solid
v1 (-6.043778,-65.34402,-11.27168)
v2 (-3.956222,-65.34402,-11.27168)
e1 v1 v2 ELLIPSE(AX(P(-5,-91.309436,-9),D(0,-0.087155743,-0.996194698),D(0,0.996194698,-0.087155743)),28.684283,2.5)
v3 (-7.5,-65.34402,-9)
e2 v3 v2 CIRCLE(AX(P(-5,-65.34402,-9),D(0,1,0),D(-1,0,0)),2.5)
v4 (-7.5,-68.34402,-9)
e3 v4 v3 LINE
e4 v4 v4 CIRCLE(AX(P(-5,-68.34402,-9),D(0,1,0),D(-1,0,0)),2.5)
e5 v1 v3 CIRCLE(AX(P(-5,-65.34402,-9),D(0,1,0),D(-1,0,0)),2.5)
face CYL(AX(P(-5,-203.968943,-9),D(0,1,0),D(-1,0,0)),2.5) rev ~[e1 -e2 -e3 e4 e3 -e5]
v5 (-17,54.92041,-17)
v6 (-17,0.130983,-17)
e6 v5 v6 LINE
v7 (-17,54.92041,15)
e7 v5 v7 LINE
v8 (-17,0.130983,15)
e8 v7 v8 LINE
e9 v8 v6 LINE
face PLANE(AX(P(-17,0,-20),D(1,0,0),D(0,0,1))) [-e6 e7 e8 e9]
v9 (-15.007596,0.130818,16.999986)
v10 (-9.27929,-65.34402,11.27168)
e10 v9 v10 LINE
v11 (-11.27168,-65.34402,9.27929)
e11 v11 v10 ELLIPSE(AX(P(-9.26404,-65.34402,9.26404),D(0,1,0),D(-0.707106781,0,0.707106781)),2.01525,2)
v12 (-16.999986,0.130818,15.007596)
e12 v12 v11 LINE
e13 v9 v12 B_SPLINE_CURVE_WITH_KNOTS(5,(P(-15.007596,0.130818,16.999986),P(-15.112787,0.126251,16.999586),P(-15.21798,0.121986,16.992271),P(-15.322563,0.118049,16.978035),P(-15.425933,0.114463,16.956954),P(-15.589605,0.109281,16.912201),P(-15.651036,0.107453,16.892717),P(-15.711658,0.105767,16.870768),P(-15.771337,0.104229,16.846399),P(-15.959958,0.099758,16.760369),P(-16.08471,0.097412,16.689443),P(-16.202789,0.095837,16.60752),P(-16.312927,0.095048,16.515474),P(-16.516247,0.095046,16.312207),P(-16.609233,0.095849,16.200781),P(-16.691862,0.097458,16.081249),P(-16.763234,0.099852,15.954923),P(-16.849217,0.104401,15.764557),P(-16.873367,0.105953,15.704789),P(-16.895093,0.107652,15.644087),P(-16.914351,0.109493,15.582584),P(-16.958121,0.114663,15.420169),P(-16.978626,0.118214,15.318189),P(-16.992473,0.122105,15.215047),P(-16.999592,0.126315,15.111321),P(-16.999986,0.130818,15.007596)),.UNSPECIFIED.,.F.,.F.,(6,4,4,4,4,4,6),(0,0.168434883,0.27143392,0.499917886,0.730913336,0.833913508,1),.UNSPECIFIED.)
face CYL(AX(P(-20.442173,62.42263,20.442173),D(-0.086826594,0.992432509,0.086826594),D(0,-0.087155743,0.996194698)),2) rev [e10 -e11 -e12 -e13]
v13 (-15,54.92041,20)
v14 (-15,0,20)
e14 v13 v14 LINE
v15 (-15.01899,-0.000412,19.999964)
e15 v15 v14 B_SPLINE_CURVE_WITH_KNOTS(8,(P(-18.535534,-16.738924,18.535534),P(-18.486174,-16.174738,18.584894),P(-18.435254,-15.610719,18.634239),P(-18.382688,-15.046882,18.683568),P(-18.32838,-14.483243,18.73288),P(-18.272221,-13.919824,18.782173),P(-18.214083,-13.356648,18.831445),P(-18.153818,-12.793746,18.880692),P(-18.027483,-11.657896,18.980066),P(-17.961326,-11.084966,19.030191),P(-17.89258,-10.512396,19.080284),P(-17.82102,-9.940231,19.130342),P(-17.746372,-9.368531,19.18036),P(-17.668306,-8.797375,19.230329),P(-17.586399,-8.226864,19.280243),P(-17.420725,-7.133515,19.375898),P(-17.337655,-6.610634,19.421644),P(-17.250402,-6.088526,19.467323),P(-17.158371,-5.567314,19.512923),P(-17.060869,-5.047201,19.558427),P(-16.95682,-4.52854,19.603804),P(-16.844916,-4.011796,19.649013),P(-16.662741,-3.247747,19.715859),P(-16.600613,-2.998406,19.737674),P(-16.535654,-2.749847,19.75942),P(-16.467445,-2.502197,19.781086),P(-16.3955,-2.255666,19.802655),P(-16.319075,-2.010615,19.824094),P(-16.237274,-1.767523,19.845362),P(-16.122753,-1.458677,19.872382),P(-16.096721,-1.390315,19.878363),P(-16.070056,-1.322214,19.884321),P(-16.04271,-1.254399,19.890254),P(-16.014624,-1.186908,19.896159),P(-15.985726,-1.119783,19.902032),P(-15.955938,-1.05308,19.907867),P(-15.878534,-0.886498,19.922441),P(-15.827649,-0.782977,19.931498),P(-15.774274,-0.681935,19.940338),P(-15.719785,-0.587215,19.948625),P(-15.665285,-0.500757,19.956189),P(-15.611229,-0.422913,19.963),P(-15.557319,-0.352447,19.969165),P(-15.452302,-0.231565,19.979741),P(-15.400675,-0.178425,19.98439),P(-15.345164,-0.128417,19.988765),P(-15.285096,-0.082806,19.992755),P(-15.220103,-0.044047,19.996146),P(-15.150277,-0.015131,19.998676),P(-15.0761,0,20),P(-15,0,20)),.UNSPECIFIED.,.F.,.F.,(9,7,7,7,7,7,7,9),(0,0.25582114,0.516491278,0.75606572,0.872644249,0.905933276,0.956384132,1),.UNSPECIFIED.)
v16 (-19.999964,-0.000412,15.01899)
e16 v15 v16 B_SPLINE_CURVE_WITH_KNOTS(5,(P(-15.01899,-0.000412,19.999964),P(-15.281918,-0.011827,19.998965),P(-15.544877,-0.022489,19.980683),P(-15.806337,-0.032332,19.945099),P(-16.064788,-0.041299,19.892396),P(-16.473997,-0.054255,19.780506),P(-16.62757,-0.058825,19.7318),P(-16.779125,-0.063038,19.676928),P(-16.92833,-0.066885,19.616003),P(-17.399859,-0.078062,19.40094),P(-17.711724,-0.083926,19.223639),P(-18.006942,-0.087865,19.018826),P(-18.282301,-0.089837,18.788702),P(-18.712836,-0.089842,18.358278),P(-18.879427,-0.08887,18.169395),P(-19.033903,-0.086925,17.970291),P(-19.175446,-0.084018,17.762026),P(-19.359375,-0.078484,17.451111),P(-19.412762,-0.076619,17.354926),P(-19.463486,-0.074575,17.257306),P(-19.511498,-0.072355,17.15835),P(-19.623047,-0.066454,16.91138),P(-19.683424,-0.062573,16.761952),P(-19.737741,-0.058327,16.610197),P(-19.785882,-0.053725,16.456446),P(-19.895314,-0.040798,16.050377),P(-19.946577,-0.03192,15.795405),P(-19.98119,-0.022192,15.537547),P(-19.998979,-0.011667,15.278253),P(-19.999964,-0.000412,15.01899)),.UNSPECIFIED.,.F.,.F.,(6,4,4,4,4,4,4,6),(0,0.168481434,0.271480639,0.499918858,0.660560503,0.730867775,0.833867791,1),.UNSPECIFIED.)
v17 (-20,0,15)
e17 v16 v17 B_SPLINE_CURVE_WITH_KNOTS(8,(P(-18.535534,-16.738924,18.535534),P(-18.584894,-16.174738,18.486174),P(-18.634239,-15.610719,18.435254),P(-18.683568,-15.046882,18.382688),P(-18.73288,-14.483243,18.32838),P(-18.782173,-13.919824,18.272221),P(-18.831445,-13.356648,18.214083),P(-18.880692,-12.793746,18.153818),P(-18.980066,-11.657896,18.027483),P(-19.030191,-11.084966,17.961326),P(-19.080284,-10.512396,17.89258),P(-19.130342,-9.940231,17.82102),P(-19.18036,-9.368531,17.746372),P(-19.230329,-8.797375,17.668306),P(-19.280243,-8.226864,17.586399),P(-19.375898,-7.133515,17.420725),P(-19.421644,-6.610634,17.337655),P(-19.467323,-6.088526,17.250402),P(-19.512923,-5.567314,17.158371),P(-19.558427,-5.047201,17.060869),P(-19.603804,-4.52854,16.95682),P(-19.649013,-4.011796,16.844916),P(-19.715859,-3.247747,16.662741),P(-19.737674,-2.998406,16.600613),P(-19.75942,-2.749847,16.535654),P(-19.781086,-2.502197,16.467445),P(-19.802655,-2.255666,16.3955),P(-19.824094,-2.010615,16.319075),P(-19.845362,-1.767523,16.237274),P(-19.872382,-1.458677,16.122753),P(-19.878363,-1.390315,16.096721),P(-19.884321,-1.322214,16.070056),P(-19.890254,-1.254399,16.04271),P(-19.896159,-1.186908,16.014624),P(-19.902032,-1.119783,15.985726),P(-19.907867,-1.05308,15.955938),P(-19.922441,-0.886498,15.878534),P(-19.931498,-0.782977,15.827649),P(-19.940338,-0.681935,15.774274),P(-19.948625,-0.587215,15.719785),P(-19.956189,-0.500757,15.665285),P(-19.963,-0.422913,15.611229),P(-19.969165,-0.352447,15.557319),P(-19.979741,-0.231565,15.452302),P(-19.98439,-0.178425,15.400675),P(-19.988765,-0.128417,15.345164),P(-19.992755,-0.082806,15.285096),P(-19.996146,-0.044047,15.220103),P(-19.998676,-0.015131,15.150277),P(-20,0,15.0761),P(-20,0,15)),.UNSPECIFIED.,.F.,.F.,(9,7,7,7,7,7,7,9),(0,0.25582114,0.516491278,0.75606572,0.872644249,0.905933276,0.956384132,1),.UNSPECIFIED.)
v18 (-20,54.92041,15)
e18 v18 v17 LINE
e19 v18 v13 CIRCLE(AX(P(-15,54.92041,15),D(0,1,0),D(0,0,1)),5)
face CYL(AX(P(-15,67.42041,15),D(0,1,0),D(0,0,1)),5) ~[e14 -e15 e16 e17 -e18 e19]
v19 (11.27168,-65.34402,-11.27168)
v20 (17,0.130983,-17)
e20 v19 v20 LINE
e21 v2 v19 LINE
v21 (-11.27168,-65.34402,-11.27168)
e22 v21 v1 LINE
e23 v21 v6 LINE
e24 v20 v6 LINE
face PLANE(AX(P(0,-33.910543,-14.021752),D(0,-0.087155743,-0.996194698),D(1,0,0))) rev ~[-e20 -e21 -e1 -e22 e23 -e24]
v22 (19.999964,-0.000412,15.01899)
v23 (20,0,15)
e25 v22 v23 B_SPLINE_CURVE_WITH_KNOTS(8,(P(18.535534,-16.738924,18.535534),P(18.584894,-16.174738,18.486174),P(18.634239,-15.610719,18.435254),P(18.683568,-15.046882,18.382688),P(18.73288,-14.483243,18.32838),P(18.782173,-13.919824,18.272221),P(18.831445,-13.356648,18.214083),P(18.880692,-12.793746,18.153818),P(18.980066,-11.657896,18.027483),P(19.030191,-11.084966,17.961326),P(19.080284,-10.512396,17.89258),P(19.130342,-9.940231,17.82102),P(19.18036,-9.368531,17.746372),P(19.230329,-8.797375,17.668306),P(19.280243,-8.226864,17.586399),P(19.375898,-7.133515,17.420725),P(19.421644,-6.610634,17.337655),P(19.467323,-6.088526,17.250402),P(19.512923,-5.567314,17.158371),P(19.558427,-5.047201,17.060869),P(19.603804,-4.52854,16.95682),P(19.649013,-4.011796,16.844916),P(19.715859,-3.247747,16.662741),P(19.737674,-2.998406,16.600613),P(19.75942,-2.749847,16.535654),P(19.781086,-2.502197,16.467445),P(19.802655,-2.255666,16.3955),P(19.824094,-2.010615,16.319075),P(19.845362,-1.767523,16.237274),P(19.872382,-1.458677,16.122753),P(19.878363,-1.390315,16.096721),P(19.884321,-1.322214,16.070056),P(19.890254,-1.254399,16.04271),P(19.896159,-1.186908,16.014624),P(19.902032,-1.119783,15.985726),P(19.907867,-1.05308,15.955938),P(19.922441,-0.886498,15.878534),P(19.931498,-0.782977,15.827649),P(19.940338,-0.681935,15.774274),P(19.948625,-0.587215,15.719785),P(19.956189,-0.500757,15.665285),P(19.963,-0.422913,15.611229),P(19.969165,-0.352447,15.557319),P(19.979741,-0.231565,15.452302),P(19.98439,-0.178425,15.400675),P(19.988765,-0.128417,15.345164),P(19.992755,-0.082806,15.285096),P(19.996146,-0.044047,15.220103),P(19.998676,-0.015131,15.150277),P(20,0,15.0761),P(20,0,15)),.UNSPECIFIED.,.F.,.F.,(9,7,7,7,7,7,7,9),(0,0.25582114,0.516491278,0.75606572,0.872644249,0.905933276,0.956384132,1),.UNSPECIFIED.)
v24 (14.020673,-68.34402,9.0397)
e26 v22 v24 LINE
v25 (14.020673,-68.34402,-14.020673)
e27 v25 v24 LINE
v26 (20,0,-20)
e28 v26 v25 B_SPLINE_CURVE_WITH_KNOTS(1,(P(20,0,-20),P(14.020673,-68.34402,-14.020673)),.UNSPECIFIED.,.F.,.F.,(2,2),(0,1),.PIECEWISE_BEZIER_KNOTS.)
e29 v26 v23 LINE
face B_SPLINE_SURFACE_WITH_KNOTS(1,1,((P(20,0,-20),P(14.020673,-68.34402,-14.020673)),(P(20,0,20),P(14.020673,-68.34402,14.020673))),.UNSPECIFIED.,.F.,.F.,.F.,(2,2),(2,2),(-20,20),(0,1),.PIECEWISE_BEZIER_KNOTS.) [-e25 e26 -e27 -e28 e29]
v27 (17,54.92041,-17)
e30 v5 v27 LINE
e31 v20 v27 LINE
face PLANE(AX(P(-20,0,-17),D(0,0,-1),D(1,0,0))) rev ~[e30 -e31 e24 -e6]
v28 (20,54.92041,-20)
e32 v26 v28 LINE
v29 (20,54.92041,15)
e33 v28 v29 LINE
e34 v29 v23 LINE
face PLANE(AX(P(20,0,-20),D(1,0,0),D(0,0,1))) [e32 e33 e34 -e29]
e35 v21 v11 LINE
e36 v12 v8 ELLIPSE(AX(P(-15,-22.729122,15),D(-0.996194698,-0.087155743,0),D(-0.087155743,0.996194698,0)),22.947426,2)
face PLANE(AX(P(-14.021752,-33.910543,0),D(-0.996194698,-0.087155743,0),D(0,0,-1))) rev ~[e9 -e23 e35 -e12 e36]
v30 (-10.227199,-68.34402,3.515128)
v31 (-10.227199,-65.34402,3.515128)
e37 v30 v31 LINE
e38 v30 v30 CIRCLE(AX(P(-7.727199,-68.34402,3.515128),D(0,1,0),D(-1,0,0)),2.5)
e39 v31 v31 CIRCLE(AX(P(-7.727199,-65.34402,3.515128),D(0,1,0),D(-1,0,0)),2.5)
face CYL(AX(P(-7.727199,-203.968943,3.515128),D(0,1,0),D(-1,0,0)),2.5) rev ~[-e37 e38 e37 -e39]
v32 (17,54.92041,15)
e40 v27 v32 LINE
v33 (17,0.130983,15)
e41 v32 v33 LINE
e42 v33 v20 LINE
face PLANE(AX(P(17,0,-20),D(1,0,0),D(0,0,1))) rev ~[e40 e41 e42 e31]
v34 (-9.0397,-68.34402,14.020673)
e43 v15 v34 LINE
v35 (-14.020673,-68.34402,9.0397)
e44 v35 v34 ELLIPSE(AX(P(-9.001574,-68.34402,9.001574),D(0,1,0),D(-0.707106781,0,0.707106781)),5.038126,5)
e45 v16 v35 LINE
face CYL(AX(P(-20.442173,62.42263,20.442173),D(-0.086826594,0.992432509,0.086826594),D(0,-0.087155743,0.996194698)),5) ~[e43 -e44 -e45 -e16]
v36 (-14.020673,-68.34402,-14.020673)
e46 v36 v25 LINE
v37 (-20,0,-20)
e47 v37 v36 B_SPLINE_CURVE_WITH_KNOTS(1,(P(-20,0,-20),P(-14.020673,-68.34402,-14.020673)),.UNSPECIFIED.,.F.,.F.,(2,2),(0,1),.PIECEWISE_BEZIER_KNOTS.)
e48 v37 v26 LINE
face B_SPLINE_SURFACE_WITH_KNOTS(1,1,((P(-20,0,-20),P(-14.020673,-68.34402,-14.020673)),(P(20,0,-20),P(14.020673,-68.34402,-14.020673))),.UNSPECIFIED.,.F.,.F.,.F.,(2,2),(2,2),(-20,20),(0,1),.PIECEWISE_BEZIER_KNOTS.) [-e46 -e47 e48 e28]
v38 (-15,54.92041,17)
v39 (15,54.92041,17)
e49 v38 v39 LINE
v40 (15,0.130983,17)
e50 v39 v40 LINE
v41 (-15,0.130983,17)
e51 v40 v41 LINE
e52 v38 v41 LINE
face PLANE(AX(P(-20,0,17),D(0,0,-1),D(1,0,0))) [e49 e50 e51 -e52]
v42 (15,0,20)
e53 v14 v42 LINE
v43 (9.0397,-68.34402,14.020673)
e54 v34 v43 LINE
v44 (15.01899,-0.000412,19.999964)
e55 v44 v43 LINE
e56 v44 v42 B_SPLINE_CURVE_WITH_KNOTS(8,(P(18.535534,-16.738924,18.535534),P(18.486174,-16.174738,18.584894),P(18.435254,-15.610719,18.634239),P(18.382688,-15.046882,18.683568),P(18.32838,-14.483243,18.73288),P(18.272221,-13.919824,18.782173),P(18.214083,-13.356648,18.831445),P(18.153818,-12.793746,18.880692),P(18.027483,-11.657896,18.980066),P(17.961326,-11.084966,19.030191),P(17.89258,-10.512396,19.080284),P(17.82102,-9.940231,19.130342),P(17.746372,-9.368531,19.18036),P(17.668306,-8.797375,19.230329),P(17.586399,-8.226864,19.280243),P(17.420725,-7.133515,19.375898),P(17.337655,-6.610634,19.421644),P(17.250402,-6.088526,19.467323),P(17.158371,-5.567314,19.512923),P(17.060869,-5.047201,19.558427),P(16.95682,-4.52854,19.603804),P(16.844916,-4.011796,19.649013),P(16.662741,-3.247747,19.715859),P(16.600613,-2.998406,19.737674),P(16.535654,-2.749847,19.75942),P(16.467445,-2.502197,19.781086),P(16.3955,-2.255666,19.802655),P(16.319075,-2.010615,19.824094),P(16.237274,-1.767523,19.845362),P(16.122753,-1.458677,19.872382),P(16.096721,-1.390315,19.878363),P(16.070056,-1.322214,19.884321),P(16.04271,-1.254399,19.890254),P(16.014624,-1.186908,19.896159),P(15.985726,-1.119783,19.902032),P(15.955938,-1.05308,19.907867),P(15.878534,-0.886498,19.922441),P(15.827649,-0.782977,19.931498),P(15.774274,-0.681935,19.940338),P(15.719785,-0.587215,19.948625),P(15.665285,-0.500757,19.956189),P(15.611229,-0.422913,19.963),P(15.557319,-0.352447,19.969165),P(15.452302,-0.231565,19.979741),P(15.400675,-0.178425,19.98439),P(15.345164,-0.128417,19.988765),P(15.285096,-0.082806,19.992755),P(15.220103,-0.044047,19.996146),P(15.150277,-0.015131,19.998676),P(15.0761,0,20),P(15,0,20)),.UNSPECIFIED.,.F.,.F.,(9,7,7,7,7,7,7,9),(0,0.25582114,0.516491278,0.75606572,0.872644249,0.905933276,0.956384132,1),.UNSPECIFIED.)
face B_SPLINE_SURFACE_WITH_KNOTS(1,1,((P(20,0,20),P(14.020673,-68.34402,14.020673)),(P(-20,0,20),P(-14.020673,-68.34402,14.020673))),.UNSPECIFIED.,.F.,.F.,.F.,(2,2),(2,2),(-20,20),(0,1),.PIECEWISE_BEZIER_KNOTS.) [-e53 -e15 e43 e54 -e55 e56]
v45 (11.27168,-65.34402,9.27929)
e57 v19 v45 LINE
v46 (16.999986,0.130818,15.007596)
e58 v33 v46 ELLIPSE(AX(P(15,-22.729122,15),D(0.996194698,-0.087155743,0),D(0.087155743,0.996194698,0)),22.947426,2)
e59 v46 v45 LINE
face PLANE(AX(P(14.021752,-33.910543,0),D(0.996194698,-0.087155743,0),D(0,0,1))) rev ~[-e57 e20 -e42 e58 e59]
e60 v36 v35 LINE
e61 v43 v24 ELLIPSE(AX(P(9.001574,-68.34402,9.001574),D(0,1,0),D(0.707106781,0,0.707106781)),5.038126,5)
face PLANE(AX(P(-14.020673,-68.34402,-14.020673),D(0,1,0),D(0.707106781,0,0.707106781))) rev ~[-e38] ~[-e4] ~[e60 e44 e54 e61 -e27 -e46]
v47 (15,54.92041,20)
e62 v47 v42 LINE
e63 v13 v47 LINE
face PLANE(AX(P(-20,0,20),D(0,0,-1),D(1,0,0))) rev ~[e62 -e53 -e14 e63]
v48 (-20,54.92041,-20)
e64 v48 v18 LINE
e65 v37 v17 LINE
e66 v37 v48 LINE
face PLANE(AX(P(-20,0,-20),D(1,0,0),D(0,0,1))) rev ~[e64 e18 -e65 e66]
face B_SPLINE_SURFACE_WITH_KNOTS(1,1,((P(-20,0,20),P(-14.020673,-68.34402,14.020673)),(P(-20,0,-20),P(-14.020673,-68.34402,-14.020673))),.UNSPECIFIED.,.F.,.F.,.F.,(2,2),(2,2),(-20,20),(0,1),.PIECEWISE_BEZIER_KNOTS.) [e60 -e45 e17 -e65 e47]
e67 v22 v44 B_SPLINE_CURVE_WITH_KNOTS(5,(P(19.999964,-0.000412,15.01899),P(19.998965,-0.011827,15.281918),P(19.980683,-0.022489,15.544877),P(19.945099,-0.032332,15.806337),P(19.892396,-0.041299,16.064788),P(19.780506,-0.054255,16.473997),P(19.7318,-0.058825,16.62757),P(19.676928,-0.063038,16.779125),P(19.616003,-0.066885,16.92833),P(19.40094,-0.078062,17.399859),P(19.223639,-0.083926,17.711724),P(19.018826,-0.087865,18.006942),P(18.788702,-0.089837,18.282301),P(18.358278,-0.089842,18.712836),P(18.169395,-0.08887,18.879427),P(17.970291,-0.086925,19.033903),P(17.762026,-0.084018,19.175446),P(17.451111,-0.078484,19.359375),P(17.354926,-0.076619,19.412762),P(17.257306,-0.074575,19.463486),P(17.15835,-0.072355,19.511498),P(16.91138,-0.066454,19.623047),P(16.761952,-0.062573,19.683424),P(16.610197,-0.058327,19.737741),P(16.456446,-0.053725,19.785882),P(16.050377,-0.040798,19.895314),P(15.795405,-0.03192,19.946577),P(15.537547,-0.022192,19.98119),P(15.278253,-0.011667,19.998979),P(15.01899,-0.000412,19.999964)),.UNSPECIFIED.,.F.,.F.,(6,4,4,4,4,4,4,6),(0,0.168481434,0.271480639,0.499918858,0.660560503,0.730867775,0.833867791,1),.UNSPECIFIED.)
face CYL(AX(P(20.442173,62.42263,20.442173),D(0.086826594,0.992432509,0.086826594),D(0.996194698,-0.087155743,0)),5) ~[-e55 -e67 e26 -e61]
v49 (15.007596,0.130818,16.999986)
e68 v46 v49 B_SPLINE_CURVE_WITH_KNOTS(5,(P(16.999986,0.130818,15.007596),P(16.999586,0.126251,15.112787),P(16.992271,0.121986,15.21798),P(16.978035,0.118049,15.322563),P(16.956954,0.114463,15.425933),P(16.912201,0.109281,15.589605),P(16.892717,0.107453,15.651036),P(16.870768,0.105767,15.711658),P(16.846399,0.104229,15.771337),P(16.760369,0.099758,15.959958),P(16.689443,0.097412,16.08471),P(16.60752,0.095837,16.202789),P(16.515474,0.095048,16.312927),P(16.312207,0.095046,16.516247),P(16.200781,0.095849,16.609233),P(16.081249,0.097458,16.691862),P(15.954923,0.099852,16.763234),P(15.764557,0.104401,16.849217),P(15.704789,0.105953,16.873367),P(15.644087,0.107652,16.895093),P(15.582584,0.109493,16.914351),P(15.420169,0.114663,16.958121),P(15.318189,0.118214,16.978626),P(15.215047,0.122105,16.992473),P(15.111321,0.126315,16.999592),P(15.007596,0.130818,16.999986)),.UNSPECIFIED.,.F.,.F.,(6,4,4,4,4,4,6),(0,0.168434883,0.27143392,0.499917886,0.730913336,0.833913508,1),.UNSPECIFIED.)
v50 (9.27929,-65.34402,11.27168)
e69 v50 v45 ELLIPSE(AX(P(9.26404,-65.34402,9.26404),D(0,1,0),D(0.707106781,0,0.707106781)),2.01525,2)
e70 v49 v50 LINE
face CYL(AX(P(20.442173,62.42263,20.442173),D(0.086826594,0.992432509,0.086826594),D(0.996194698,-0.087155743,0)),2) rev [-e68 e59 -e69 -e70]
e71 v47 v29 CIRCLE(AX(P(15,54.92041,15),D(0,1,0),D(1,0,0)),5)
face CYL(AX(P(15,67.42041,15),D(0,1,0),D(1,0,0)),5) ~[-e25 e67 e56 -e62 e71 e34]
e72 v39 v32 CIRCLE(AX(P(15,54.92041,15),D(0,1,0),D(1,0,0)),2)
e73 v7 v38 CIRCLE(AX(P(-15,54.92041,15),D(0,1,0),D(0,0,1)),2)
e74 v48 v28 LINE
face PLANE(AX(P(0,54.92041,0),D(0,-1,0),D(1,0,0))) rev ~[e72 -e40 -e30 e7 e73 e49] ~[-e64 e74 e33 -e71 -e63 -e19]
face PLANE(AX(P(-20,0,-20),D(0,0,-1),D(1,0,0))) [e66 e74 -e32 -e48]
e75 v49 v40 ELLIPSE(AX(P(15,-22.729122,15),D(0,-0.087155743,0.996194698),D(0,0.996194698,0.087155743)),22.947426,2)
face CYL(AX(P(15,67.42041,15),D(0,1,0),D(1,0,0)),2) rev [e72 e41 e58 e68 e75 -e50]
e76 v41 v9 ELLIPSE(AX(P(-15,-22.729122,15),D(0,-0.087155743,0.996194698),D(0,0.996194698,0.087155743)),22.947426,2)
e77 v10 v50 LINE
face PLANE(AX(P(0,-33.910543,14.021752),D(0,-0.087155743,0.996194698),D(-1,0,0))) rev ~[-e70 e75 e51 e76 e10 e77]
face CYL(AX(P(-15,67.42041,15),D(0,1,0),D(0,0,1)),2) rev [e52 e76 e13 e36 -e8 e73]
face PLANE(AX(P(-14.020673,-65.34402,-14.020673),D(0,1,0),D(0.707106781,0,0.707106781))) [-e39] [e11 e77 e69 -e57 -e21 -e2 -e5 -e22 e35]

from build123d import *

# Parameters (mm, degrees)
F0_W          = 40
F0_H          = 40
F1_DEPTH      = 68.34402
F1_TAPER      = 5
F1_DEPTH_BACK = 54.92041
F2_T1_DEPTH   = 129.92041
F2_T3_DEPTH   = 143.2975946274
F2_T5_DEPTH   = 143.2975946274
F3_T          = 3
F5_D          = 5


# Not quite as in the source:
# - a fillet or chamfer that OpenCascade refuses, or shapes differently, is made with other operations: its cross-section is extruded or revolved along the edge and cut away or added
# - a shell that OpenCascade refuses in one call is made with other operations: the cavity is built on its own and cut out


with BuildPart() as f1:
    # F0 (on Front) → F1 (new body, two sides)
    with BuildSketch(Plane.XZ) as f1_sk:
        Rectangle(F0_W, F0_H)
    extrude(amount=F1_DEPTH, taper=F1_TAPER)
    extrude(f1_sk.sketch, amount=-F1_DEPTH_BACK)

    # F2: fillet of radius 5 on 4 edges, made by hand

    # F2_s2 → F2_t1 (cut)
    with BuildSketch(Plane.XZ.offset(-67.42041)):
        with BuildLine():
            ThreePointArc((20, 15), (18.5355339059, 18.5355339059), (15, 20))
            Line((15, 20), (20, 20))
            Line((20, 20), (20, 15))
        make_face()
        with BuildLine():
            ThreePointArc((-15, 20), (-18.5355339059, 18.5355339059), (-20, 15))
            Line((-20, 15), (-20, 20))
            Line((-20, 20), (-15, 20))
        make_face()
    extrude(amount=F2_T1_DEPTH, mode=Mode.SUBTRACT)

    # F2_s4 → F2_t3 (cut)
    with BuildSketch(Plane(origin=(5.6871501966, 65.0044242011, 5.6871501966), x_dir=(0.9961946981, -0.0871557427, 0), z_dir=(-0.0868265939, -0.9924325091, -0.0868265939))):
        with BuildLine():
            ThreePointArc((19.9238939618, 14.8109575307), (18.4728306397, 18.3330376627), (14.9618745793, 19.8108132759))
            Line((14.9618745793, 19.8108132759), (19.9238939618, 19.7731200764))
            Line((19.9238939618, 19.7731200764), (19.9238939618, 14.8109575307))
        make_face()
    extrude(amount=F2_T3_DEPTH, mode=Mode.SUBTRACT)

    # F2_s6 → F2_t5 (cut)
    with BuildSketch(Plane(origin=(-5.6871501966, 65.0044242011, 5.6871501966), x_dir=(0.9961946981, 0.0871557427, 0), z_dir=(0.0868265939, -0.9924325091, -0.0868265939))):
        with BuildLine():
            ThreePointArc((-14.9618745793, 19.8108132759), (-18.4728306397, 18.3330376627), (-19.9238939618, 14.8109575307))
            Line((-19.9238939618, 14.8109575307), (-19.9238939618, 19.7731200764))
            Line((-19.9238939618, 19.7731200764), (-14.9618745793, 19.8108132759))
        make_face()
    extrude(amount=F2_T5_DEPTH, mode=Mode.SUBTRACT)

    # F3: shell of thickness 3, made by hand


with BuildPart() as f3_core1:
    # F3_t2: copy of F1
    add(f1.part)

    # the walls: a layer under each face that stays
    f3_faces = [f3_core1.faces().sort_by_distance(p)[0] for p in [
        (20, 27.460205, -2.5),
        (17.0103365151, -34.17201, -2.1182047008),
        (18.5355339059, 27.415284207, 18.5355339059),
        (0, 27.460205, -20),
        (0, -34.17201, -17.0103365151),
        (0, -68.34402, -1.4566061483),
        (15.5420062021, -34.3060178162, 15.5420062021),
        (0, 27.460205, 20),
        (0, -34.17201, 17.0103365151),
        (-20, 27.460205, -2.5),
        (-18.5355339059, 27.415284207, 18.5355339059),
        (-17.0103365151, -34.17201, -2.1182047008),
        (-15.5420062021, -34.3060178161, 15.5420062021),
    ]]
    thicken(f3_faces, amount=-F3_T, mode=Mode.SUBTRACT)


with BuildPart() as f1_1:
    add(f1.part)

    # what is left inside the walls is the cavity
    f3_cavity = [f3_core1.part.solids().sort_by_distance(p)[0] for p in [
        (0, 36.657268, -16.97),
    ]]
    add(f3_cavity, mode=Mode.SUBTRACT)

    # F5 (through all)
    with Locations(Plane.XZ.offset(68.34402)):
        with Locations((-5, -9), (-7.7271993353, 3.5151276782)):
            Hole(F5_D / 2)


solid = f1_1.part
